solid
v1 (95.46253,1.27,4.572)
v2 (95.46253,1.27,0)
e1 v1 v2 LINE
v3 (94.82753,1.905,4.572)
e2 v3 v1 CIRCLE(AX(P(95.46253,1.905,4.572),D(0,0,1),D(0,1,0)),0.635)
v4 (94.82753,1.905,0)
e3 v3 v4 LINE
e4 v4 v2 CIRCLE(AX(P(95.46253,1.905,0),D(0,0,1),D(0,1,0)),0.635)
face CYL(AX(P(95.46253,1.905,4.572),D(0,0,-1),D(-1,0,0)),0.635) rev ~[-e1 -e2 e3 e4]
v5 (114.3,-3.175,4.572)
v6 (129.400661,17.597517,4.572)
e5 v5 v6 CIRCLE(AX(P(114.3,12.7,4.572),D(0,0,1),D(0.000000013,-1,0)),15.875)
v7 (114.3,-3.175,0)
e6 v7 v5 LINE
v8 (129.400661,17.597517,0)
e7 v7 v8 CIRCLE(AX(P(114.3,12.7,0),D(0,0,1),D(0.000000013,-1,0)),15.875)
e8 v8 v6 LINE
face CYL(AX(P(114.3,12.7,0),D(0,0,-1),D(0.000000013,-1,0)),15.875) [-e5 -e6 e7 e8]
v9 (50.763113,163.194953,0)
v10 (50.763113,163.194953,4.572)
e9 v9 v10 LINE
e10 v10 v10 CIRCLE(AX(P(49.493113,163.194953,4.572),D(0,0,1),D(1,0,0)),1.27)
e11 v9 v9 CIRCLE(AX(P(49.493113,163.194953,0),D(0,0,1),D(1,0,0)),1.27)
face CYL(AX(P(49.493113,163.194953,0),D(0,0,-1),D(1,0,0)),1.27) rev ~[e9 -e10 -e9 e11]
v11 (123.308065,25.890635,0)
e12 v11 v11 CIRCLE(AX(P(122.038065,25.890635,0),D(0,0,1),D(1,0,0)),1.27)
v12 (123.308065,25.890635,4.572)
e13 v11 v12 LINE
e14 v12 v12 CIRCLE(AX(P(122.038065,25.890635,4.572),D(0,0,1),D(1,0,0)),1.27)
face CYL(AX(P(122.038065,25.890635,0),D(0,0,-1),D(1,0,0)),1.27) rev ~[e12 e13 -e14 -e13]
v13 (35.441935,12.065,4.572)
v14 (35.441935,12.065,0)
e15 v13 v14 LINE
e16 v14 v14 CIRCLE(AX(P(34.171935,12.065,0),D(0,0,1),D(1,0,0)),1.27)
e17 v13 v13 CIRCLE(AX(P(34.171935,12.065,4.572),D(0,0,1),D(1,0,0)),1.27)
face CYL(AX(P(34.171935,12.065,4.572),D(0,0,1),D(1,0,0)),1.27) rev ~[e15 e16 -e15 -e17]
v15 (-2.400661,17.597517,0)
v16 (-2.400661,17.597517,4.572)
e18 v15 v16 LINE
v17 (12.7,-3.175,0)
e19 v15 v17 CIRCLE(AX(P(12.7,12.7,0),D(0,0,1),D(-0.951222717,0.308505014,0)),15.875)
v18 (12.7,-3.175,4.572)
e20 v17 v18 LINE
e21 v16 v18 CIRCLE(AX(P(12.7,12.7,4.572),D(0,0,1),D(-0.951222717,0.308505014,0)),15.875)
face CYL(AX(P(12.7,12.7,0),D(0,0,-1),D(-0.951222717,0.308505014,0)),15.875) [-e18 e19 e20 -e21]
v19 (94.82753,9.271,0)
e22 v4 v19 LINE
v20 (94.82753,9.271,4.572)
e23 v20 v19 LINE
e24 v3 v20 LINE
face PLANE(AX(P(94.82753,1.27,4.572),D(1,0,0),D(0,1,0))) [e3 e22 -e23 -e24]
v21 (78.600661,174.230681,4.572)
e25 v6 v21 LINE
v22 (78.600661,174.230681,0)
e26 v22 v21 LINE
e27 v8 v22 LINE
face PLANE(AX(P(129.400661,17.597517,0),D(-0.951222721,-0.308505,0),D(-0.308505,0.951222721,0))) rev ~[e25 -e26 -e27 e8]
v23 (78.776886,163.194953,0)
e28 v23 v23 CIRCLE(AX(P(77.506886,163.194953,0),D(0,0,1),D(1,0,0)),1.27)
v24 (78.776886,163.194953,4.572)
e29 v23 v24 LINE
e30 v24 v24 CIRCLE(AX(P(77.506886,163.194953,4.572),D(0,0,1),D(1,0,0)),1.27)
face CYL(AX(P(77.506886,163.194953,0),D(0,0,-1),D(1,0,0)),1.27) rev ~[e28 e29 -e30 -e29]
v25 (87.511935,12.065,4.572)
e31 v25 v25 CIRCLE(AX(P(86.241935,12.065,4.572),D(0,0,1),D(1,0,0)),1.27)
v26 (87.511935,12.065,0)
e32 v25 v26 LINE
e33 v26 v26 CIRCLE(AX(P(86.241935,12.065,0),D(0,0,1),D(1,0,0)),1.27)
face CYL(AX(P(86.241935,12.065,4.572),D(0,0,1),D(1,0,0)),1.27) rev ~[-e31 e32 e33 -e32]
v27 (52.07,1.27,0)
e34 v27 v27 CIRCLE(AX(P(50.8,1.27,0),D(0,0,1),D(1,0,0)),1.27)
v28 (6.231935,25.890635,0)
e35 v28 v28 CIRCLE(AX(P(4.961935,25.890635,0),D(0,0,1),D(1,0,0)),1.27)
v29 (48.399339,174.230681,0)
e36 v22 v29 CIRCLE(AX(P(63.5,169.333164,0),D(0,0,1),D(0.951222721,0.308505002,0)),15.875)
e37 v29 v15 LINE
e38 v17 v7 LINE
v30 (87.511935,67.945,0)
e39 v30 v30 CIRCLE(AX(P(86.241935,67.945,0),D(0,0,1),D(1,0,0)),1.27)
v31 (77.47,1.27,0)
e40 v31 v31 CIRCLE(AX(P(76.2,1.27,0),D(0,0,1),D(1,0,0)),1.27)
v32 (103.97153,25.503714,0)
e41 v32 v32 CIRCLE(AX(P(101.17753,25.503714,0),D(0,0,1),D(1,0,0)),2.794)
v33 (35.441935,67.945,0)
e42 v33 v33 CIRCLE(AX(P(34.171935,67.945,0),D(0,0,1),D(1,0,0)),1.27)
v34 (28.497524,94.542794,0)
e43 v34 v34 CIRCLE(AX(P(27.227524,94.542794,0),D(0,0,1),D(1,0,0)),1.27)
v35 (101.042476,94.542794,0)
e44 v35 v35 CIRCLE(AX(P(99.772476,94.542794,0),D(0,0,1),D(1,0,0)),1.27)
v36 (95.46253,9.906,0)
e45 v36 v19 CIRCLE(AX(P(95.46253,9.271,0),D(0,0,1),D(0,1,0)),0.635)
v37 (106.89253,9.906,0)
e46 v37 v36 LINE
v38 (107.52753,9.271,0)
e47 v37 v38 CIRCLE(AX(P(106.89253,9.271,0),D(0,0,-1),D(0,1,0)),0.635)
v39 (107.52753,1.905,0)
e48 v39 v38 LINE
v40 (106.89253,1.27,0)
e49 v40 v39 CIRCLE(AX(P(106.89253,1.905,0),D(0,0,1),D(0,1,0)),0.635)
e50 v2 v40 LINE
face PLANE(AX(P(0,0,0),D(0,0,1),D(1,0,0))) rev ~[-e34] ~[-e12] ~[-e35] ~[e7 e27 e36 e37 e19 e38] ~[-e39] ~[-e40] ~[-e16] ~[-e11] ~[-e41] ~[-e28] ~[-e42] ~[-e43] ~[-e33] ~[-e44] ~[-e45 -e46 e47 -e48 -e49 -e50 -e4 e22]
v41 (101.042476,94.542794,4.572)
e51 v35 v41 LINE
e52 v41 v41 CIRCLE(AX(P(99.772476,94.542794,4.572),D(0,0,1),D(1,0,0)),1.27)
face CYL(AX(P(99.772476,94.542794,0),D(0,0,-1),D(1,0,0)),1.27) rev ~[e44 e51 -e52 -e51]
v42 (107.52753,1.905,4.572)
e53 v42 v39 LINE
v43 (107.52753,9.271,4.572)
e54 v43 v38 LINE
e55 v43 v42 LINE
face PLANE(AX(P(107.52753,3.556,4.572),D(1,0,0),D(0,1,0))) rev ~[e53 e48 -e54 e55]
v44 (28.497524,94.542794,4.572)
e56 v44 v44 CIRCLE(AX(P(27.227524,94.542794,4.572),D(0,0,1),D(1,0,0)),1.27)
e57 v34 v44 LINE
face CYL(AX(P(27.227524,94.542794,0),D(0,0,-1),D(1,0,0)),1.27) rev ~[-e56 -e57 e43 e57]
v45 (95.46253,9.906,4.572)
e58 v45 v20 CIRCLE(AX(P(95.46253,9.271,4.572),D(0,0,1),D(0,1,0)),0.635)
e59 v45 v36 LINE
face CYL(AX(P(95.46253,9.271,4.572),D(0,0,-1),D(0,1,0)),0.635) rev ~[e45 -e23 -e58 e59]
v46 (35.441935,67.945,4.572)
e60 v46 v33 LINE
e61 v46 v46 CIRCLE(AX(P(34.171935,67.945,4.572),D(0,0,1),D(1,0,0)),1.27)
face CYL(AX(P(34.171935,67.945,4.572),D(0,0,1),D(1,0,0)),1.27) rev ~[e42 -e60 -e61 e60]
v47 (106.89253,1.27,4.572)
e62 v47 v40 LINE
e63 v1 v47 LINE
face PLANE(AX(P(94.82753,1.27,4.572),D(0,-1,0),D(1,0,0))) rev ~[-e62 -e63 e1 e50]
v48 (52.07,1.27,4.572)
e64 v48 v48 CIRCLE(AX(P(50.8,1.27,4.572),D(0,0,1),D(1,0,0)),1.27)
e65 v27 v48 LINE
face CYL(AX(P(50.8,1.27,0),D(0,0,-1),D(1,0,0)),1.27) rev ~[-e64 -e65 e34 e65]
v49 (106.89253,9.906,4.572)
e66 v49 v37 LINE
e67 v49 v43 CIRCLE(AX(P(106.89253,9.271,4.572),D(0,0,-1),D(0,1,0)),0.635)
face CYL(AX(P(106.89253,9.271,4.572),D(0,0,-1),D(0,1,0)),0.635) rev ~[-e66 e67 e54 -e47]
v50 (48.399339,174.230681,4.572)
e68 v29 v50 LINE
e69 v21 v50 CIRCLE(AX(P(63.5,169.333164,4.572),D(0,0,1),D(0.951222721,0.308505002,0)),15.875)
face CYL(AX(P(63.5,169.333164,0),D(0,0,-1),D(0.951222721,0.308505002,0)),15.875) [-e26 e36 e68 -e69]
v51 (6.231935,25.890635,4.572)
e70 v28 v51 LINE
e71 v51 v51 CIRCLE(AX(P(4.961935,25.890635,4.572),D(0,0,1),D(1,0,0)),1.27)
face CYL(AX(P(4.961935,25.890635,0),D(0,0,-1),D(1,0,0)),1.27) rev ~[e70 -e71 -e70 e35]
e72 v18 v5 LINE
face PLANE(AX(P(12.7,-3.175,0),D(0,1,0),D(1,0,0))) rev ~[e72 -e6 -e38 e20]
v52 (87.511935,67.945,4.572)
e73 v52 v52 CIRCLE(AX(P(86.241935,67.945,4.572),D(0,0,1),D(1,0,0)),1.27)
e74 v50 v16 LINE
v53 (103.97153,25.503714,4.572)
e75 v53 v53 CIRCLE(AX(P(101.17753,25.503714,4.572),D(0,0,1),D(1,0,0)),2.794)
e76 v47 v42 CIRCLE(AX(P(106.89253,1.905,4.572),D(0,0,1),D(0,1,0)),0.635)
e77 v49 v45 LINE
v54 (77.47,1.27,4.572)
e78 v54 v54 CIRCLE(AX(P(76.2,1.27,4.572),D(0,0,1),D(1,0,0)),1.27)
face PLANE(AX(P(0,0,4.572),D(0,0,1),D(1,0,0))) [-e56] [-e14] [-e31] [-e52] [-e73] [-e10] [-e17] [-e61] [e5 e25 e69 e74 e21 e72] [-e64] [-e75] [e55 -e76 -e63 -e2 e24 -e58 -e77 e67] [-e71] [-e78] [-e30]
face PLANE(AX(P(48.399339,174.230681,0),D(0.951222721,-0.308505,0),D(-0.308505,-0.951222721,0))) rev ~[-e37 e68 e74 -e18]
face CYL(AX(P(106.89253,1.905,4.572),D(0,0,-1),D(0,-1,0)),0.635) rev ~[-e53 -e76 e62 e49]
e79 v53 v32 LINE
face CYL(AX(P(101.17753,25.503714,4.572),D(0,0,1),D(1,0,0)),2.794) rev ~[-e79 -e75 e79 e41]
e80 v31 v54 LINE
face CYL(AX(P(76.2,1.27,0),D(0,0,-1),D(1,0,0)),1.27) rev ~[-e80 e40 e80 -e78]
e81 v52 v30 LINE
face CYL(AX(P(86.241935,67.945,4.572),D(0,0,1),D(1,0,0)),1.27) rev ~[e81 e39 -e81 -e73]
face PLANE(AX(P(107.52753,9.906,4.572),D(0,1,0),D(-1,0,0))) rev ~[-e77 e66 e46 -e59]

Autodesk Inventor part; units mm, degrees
ref_plane "YZ Plane" through (0, 0, 0) normal (1, 0, 0) x (0, 1, 0)
ref_plane "XZ Plane" through (0, 0, 0) normal (0, 1, 0) x (-1, 0, 0)
sketch "Sketch1" plane through (0, 0, 0) normal (0, 0, 1) x (1, 0, 0)
  arc A0 (-2.400661, 17.597517) -> (12.7, -3.175) centre (12.7, 12.7) ccw
  arc A1 (114.3, -3.175) -> (129.400661, 17.597517) centre (114.3, 12.7) ccw
  line L0 (114.3, -3.175) -> (12.7, -3.175)
  line L1 (48.399339, 174.230681) -> (-2.400661, 17.597517)
  line L2 (129.400661, 17.597517) -> (78.600661, 174.230681)
  arc A2 (78.600661, 174.230681) -> (48.399339, 174.230681) centre (63.5, 169.333164) ccw
  arc A3 (75.580529, 173.251177) -> (51.419471, 173.251177) centre (63.5, 169.333164) ccw
  arc A4 (0.619471, 16.618013) -> (12.7, 0) centre (12.7, 12.7) ccw
  arc A5 (114.3, 0) -> (126.380529, 16.618013) centre (114.3, 12.7) ccw
  line L3 (12.7, 0) -> (114.3, 0)
  line L4 (0.619471, 16.618013) -> (51.419471, 173.251177)
  line L5 (75.580529, 173.251177) -> (126.380529, 16.618013)
  line L6 (0.619471, 16.618013) -> (3.753882, 26.282436)
  line L7 (3.753882, 26.282436) -> (4.961935, 25.890635)
  circle A6 centre (4.961935, 25.890635) radius 1.27
  line L8 (51.419471, 173.251177) -> (48.285061, 163.586755)
  line L9 (48.285061, 163.586755) -> (49.493113, 163.194953)
  circle A7 centre (49.493113, 163.194953) radius 1.27
  circle A8 centre (27.227524, 94.542794) radius 1.27
  line L10 (75.580529, 173.251177) -> (78.714939, 163.586755)
  line L11 (78.714939, 163.586755) -> (77.506886, 163.194953)
  circle A9 centre (77.506886, 163.194953) radius 1.27
  line L12 (126.380529, 16.618013) -> (123.246118, 26.282436)
  line L13 (123.246118, 26.282436) -> (122.038065, 25.890635)
  circle A10 centre (122.038065, 25.890635) radius 1.27
  circle A11 centre (99.772476, 94.542794) radius 1.27
  line L14 (63.5, 0) -> (63.5, 1.27) construction
  line L15 (63.5, 1.27) -> (76.2, 1.27) construction
  line L16 (63.5, 1.27) -> (50.8, 1.27) construction
  circle A12 centre (50.8, 1.27) radius 1.27
  circle A13 centre (76.2, 1.27) radius 1.27
  point P0 (0, 0)
  point P1 (0, 0)
  dimension "d50" = 2.54
  dimension "d53" = 2.54
  dimension "d39" = 31.75
  dimension "d40" = 31.75
  dimension "d41" = 25.4
  dimension "d42" = 25.4
  dimension "d43" = 25.4
  dimension "d44" = 10.16
  dimension "d45" = 10.16
  dimension "d46" = 1.27
  dimension "d47" = 1.27
  dimension "d48" = 10.16
  dimension "d49" = 10.16
  dimension "d51" = 2.54
  dimension "d52" = 2.54
  dimension "d91" = 12.7
  dimension "d92" = 12.7
ref_plane "Work Plane1" through (0, 0, 4.572) normal (0, 0, 1) x (1, 0, 0)
sketch "Sketch2" plane through (0, 0, 4.572) normal (0, 0, 1) x (1, 0, 0)
  line L0 (12.7, -3.175) -> (114.3, -3.175)
  line L1 (34.171935, 12.065) -> (34.171935, 67.945) construction
  line L2 (34.171935, 67.945) -> (86.241935, 67.945) construction
  line L3 (86.241935, 67.945) -> (86.241935, 12.065) construction
  line L4 (86.241935, 12.065) -> (34.171935, 12.065) construction
  line L5 (34.171935, 12.065) -> (86.241935, 67.945) construction
  line L6 (34.171935, 67.945) -> (86.241935, 12.065) construction
  circle A0 centre (34.171935, 67.945) radius 1.27
  circle A1 centre (34.171935, 12.065) radius 1.27
  circle A2 centre (86.241935, 12.065) radius 1.27
  circle A3 centre (86.241935, 67.945) radius 1.27
  circle A4 centre (4.961935, 25.890635) radius 1.27
  arc A5 (78.600661, 174.230681) -> (48.399339, 174.230681) centre (63.5, 169.333164) ccw
  point P0 (0, 0)
  point P1 (60.206935, 40.005)
  dimension "d71" = 55.88
  dimension "d73" = 52.07
  dimension "d74" = 2.54
  dimension "d75" = 2.54
  dimension "d76" = 2.54
  dimension "d77" = 2.54
  dimension "d80" = 52.07
  dimension "d81" = 15.24
  dimension "d82" = 29.21
sketch "Sketch1 outline for Extrusion8" plane through (0, 0, 0) normal (0, 0, 1) x (1, 0, 0)
  arc A0 (78.600661, 174.230681) -> (48.399339, 174.230681) centre (63.5, 169.333164) ccw
  line L0 (129.400661, 17.597517) -> (78.600661, 174.230681)
  line L1 (48.399339, 174.230681) -> (-2.400661, 17.597517)
  arc A1 (114.3, -3.175) -> (129.400661, 17.597517) centre (114.3, 12.7) ccw
  arc A2 (-2.400661, 17.597517) -> (12.7, -3.175) centre (12.7, 12.7) ccw
  line L2 (12.7, -3.175) -> (114.3, -3.175)
  circle A3 centre (4.961935, 25.890635) radius 1.27
  circle A4 centre (50.8, 1.27) radius 1.27
  circle A5 centre (76.2, 1.27) radius 1.27
  circle A6 centre (122.038065, 25.890635) radius 1.27
  circle A7 centre (27.227524, 94.542794) radius 1.27
  circle A8 centre (49.493113, 163.194953) radius 1.27
  circle A9 centre (99.772476, 94.542794) radius 1.27
  circle A10 centre (77.506886, 163.194953) radius 1.27
extrude "Extrusion8" add sketch "Sketch1 outline for Extrusion8" along normal blind 4.572
sketch "Sketch3" plane through (0, 0, 4.572) normal (0, 0, 1) x (1, 0, 0)
  circle A0 centre (76.2, 1.27) radius 1.27
  line L0 (76.2, 1.27) -> (117.405446, 1.27)
  line L1 (117.405446, 1.27) -> (117.405446, 3.556)
  line L2 (76.2, 3.556) -> (76.2, 1.27)
  line L3 (107.52753, 3.556) -> (107.52753, 9.906)
  line L4 (107.52753, 9.906) -> (94.82753, 9.906)
  line L5 (94.82753, 9.906) -> (94.82753, 3.556)
  circle A1 centre (101.17753, 25.503714) radius 2.794
  line L6 (12.7, -3.175) -> (114.3, -3.175)
  line L7 (63.5, -3.175) -> (63.5, 31.793571) construction
  line L8 (101.17753, 8.001) -> (63.5, 8.001) construction
  line L9 (107.52753, 3.556) -> (107.52753, 1.27)
  line L10 (107.52753, 1.27) -> (94.82753, 1.27)
  line L11 (94.82753, 1.27) -> (94.82753, 3.556)
  line L12 (117.405446, 3.556) -> (107.52753, 3.556)
  line L13 (94.82753, 3.556) -> (76.2, 3.556)
  point P0 (0, 0)
  dimension "d97" = 2.286
  dimension "d98" = 12.7
  dimension "d99" = 6.35
  dimension "d106" = 5.588
  dimension "d109" = 37.67753
extrude "Extrusion10" cut sketch "Sketch3" against normal blind 25.4 contours L11 L5 L4 L3 L9 L0 | A1
fillet "Fillet1" radius 0.635 1 edges at (94.8275, 9.906, 2.286)
fillet "Fillet2" radius 0.635 1 edges at (107.5275, 9.906, 2.286)
extrude "Extrusion11" cut sketch "Sketch2" against normal blind 25.4 contours A0 | A1 | A2 | A3
fillet "Fillet5" radius 0.635 1 edges at (94.8275, 1.27, 2.286)
fillet "Fillet6" radius 0.635 1 edges at (107.5275, 1.27, 2.286)
properties part number "Nathan_LED_Speaker_Back"
